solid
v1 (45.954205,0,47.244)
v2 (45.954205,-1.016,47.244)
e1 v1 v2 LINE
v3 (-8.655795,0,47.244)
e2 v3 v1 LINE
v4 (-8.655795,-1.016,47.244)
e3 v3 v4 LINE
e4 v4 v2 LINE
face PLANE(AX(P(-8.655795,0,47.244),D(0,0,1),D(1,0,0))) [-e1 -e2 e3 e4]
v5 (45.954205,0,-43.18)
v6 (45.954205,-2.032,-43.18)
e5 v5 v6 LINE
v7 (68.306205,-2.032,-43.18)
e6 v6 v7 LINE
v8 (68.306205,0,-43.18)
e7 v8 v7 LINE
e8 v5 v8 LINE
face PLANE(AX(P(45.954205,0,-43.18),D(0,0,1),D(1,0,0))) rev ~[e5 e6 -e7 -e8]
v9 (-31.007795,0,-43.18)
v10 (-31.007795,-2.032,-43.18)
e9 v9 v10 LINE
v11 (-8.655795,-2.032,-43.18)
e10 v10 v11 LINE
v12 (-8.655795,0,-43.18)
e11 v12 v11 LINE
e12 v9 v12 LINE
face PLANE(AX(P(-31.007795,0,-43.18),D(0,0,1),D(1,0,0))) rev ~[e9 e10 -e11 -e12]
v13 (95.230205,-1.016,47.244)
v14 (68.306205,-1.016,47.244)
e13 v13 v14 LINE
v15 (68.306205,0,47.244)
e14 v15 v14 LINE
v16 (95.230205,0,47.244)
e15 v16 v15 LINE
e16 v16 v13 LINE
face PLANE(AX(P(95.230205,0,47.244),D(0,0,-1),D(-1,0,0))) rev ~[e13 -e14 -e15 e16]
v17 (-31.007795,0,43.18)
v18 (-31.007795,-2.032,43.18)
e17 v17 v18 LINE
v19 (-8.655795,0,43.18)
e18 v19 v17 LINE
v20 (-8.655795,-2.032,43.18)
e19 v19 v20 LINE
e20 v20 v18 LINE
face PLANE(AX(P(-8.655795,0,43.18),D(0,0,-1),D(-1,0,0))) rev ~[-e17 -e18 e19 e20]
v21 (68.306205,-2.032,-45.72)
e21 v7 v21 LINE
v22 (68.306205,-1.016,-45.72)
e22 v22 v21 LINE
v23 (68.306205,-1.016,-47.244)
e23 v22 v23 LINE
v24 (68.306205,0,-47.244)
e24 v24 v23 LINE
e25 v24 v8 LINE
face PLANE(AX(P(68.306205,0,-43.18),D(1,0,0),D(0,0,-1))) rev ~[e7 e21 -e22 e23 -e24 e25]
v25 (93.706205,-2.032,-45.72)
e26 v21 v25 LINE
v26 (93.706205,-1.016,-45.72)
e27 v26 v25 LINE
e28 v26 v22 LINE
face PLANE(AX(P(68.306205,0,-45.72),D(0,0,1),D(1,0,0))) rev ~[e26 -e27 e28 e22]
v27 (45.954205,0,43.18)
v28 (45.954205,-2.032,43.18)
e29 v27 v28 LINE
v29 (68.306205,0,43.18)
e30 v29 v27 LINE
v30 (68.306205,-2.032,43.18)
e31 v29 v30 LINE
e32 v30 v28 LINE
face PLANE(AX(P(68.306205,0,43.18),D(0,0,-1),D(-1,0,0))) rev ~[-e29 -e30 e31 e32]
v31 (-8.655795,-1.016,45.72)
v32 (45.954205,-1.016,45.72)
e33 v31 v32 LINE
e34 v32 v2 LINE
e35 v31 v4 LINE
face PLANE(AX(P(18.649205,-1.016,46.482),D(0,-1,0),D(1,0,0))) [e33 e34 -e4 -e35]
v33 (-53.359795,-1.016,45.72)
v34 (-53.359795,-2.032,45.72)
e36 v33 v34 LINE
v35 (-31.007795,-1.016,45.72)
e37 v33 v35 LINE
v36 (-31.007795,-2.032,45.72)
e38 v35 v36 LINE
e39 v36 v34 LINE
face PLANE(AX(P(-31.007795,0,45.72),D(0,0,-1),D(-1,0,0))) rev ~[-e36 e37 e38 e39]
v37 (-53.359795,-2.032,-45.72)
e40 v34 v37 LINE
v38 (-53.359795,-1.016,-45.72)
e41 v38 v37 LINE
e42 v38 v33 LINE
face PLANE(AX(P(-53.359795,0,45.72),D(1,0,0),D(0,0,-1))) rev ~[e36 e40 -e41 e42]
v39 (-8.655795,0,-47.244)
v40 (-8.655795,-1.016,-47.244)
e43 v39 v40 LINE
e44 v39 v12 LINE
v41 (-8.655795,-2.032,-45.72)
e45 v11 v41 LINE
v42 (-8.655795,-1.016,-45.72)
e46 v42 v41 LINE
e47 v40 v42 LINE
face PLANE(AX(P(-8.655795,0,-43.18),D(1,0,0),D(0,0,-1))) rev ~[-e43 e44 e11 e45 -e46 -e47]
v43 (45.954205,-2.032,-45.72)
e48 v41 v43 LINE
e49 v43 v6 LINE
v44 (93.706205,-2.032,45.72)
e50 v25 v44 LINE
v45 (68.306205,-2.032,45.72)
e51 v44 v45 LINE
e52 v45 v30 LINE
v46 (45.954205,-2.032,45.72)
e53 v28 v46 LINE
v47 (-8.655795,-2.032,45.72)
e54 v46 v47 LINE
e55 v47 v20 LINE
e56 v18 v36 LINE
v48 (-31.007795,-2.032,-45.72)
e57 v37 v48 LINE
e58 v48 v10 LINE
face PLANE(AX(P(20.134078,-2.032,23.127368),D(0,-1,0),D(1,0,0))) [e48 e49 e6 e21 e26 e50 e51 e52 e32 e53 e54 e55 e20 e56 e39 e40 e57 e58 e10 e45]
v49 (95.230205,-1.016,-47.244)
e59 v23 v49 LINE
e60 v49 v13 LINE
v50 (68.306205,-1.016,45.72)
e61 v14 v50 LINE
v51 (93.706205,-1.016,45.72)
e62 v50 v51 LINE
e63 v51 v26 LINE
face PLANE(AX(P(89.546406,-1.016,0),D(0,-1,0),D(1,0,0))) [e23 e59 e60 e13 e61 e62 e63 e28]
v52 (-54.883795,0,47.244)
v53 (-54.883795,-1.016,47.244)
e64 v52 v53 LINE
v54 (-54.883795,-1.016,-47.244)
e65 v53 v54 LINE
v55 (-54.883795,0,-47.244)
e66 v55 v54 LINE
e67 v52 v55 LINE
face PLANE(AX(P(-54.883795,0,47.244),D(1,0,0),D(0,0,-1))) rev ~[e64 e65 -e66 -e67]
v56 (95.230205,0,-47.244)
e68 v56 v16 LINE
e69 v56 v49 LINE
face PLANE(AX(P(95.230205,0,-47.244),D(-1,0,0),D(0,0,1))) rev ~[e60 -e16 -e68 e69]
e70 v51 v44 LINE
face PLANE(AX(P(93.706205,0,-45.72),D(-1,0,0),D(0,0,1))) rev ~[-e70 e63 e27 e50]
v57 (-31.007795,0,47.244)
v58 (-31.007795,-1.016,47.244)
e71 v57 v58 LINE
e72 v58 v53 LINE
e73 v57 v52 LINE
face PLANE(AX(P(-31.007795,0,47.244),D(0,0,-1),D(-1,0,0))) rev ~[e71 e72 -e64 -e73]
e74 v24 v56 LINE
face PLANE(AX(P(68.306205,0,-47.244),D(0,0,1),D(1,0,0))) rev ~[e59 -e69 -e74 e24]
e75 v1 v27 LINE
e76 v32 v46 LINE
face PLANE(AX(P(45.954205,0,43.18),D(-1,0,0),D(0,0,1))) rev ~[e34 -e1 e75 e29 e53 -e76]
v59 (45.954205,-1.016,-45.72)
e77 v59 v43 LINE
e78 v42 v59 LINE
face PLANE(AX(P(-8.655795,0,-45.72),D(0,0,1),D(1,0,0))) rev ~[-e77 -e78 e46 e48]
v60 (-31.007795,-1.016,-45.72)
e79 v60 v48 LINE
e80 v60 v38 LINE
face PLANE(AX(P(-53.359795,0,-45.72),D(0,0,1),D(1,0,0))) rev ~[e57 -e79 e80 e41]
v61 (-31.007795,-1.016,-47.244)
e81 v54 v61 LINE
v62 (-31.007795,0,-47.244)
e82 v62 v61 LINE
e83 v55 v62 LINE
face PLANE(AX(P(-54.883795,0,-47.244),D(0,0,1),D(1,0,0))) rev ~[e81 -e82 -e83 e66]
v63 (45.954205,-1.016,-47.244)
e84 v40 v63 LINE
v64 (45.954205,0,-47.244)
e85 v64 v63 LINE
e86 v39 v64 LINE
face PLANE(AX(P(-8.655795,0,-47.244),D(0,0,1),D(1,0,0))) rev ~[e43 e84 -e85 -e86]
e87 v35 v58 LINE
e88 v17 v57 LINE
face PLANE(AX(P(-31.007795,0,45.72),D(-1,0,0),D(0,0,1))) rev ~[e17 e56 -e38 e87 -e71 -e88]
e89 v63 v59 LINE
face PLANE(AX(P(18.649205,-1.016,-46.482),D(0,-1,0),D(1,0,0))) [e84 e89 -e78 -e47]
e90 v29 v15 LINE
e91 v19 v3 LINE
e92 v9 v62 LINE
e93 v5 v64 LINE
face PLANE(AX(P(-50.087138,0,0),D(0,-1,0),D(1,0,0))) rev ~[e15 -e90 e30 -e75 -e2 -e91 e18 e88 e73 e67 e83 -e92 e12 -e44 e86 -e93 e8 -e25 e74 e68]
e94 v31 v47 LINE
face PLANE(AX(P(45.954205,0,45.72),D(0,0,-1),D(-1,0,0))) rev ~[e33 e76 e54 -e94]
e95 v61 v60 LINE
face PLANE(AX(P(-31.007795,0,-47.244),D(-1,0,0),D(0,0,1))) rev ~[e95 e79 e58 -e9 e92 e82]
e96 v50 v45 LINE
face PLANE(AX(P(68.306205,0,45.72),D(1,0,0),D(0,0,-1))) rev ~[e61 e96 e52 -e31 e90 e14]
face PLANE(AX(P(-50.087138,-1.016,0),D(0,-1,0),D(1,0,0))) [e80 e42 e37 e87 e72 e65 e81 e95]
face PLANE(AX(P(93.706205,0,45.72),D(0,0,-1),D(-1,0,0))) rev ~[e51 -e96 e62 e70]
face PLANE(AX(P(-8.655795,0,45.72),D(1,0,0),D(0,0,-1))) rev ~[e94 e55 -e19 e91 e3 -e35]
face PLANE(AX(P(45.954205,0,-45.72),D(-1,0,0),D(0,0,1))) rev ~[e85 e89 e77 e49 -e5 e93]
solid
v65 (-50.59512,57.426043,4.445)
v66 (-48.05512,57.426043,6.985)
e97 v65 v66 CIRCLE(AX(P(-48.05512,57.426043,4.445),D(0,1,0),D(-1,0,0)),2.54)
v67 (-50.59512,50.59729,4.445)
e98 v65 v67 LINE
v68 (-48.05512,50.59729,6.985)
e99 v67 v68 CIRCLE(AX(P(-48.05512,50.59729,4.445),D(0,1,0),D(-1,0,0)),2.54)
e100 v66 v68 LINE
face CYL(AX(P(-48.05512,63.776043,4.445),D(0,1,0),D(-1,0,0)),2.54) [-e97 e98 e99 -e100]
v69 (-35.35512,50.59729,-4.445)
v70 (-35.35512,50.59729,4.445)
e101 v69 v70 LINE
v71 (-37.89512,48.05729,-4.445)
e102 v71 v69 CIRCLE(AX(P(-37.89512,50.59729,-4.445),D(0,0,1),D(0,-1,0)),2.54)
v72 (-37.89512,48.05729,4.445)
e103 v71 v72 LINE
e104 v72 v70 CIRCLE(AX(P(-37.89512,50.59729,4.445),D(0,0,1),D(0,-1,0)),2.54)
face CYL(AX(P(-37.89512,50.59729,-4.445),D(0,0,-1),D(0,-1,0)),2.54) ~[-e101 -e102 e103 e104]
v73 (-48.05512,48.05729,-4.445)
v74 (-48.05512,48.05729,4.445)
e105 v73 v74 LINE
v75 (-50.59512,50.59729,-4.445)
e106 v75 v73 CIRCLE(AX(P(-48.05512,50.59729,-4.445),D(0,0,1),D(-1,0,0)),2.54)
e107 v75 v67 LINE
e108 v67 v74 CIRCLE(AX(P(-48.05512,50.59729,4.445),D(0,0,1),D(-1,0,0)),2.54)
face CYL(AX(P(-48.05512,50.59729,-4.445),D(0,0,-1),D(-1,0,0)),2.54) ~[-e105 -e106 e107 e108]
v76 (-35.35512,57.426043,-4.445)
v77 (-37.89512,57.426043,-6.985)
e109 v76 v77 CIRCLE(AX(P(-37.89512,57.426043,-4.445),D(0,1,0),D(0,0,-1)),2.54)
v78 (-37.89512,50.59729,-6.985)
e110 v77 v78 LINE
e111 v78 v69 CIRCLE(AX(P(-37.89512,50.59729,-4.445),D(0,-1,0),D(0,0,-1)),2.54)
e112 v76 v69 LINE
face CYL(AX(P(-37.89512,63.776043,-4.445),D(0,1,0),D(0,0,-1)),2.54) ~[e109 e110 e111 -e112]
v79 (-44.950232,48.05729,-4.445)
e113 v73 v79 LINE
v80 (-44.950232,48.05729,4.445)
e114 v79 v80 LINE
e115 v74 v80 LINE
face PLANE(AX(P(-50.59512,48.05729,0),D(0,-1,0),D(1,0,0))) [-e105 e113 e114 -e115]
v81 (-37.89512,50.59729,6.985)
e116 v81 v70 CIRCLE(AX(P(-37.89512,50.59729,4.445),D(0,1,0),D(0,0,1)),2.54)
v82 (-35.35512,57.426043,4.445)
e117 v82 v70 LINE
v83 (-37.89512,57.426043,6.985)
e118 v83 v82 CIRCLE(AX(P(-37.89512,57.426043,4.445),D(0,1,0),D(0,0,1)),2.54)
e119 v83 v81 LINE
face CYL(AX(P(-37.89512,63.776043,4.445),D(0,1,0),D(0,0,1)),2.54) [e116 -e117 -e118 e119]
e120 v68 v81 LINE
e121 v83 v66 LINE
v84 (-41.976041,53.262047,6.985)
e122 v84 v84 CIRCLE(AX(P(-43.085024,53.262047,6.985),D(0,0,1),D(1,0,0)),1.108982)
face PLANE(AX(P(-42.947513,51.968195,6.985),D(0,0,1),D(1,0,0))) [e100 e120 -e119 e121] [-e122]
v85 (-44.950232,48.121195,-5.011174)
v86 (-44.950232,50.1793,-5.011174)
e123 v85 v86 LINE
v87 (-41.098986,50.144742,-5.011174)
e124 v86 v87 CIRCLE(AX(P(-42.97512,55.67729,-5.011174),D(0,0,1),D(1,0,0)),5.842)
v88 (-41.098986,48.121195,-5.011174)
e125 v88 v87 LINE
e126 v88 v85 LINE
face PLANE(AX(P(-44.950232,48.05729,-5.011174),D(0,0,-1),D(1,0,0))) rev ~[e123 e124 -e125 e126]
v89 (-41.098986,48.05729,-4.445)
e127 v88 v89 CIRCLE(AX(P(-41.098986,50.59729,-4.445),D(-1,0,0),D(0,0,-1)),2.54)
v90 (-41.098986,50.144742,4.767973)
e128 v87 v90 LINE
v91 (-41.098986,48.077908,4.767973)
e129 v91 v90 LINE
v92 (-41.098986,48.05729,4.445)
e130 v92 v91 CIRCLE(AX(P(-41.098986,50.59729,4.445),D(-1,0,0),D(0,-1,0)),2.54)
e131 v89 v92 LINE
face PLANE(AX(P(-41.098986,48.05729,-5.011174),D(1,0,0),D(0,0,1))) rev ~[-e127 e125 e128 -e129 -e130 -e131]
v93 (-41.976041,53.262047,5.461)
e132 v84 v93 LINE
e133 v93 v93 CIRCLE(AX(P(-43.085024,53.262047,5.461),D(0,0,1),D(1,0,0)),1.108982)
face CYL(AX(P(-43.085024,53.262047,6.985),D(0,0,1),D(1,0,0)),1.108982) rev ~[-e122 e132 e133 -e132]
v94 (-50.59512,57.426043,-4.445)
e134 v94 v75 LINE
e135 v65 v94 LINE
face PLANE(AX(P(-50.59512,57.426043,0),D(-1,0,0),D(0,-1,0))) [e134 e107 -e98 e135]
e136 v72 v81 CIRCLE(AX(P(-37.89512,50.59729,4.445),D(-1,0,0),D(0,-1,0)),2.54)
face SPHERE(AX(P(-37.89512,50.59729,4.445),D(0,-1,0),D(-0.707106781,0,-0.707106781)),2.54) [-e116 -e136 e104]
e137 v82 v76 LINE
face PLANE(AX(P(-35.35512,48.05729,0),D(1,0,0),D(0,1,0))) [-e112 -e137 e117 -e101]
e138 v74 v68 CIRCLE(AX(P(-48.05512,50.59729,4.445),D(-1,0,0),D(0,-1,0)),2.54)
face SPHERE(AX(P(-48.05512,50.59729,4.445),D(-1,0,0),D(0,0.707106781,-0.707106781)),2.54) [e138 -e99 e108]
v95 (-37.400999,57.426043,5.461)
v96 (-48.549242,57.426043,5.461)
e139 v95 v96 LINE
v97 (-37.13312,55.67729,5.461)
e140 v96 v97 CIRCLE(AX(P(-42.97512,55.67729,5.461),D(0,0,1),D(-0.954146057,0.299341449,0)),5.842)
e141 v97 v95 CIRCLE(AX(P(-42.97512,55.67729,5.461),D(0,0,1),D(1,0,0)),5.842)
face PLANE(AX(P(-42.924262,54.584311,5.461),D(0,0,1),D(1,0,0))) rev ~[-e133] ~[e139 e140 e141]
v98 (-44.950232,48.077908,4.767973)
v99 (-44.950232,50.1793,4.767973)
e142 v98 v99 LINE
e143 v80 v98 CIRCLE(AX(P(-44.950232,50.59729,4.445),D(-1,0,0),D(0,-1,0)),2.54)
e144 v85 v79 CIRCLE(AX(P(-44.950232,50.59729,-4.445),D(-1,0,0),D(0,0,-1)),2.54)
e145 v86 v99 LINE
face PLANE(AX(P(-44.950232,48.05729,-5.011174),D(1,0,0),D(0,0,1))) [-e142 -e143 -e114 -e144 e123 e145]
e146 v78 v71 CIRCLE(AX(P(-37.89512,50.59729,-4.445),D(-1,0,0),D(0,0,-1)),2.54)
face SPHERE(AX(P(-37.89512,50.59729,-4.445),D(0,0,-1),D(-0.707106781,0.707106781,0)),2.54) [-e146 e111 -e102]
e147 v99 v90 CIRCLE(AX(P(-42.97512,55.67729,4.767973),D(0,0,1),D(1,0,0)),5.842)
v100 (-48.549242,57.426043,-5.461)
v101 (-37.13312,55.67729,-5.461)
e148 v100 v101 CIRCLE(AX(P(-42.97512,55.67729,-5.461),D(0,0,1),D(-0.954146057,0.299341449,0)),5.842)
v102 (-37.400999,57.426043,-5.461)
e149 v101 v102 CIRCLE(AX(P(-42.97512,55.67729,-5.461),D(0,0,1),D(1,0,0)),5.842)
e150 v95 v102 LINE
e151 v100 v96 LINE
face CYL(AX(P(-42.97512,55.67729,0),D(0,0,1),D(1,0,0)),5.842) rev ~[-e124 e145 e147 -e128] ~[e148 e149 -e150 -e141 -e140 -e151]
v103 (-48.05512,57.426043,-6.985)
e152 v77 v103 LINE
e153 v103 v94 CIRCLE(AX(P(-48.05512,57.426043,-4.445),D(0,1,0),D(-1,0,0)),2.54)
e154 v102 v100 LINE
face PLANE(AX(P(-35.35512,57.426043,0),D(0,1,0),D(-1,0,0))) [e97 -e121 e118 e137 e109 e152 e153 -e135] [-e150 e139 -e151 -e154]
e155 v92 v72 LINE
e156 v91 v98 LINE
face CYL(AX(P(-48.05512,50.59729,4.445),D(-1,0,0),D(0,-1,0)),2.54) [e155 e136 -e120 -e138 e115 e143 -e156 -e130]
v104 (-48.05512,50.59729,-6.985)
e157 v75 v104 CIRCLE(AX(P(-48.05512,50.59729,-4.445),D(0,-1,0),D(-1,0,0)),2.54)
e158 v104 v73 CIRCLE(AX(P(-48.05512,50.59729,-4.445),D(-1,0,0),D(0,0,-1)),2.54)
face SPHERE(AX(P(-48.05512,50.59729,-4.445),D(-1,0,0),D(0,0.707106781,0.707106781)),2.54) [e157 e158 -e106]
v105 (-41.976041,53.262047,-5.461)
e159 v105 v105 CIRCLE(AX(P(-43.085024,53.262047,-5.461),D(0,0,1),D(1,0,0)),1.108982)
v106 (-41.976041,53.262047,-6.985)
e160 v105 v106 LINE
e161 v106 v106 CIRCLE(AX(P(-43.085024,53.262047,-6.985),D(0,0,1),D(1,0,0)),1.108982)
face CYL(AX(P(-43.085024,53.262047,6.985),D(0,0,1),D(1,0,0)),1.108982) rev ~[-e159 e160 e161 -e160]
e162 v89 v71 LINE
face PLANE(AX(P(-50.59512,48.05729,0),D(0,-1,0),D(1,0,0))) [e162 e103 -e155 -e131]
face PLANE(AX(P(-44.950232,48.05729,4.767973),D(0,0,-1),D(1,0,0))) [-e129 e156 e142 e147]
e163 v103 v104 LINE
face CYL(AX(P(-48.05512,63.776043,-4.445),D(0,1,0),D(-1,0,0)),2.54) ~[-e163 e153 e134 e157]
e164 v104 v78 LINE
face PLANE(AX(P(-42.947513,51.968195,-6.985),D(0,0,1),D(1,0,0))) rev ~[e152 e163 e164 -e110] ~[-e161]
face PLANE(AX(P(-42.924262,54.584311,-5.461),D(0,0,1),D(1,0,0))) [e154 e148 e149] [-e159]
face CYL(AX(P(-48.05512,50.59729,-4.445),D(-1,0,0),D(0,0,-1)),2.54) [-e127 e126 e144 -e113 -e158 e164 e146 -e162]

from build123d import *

# Parameters (mm, degrees)
F1_DEPTH      = 2.032
F0_W          = 54.61
F0_H          = 1.524
F2_DEPTH      = 1.016
F4_DEPTH      = 6.985
F5_DEPTH      = 5.461
F6_R          = 1.108982449
F7_DEPTH      = 25.4
F8_W          = 3.8512460887
F8_H          = 9.7791478038
F9_DEPTH      = 25.4
F10_T1_DEPTH  = 13.1787527424
F10_T3_DEPTH  = 8.89
F10_T5_DEPTH  = 10.16
F10_S9_W      = 2.54
F10_S9_H      = 2.54
F10_T10_DEPTH = 2.54
F10_S15_W     = 2.54
F10_S15_H     = 2.54
F10_T16_DEPTH = 2.54
F10_S21_W     = 2.54
F10_S21_H     = 2.54
F10_T22_DEPTH = 2.54
F10_S27_W     = 2.54
F10_S27_H     = 2.54
F10_T28_DEPTH = 2.54


# Not quite as in the source:
# - a fillet or chamfer that OpenCascade refuses, or shapes differently, is made with other operations: its cross-section is extruded or revolved along the edge and cut away or added


with BuildPart() as f1:
    # F0 (on Front) → F1 (new body)
    with BuildSketch(Plane.XZ):
        Polygon((-53.3597948303, 45.72), (-53.3597948303, 0), (93.7062051697, 0), (93.7062051697, 45.72), (68.3062051697, 45.72), (68.3062051697, 43.18), (45.9542051697, 43.18), (45.9542051697, 45.72), (-8.6557948303, 45.72), (-8.6557948303, 43.18), (-31.0077948303, 43.18), (-31.0077948303, 45.72), align=None)
        Polygon((93.7062051697, 0), (-53.3597948303, 0), (-53.3597948303, -45.72), (-31.0077948303, -45.72), (-31.0077948303, -43.18), (-8.6557948303, -43.18), (-8.6557948303, -45.72), (45.9542051697, -45.72), (45.9542051697, -43.18), (68.3062051697, -43.18), (68.3062051697, -45.72), (93.7062051697, -45.72), align=None)
    extrude(amount=F1_DEPTH)

    # F0 (on Front) → F2 (join)
    with BuildSketch(Plane.XZ):
        Polygon((-53.3597948303, -45.72), (-53.3597948303, 0), (-53.3597948303, 45.72), (-31.0077948303, 45.72), (-31.0077948303, 47.244), (-54.8837948303, 47.244), (-54.8837948303, 0), (-54.8837948303, -47.244), (-31.0077948303, -47.244), (-31.0077948303, -45.72), align=None)
        with Locations((18.6492051697, 46.482)):
            Rectangle(F0_W, F0_H)
        Polygon((93.7062051697, 45.72), (93.7062051697, 0), (93.7062051697, -45.72), (68.3062051697, -45.72), (68.3062051697, -47.244), (95.2302051697, -47.244), (95.2302051697, 12.7), (95.2302051697, 47.244), (68.3062051697, 47.244), (68.3062051697, 45.72), align=None)
        with Locations((18.6492051697, -46.482)):
            Rectangle(F0_W, F0_H)
    extrude(amount=F2_DEPTH)


with BuildPart() as f4:
    # F3 (on Top) → F4 (new body, symmetric)
    with BuildSketch(Plane.XY):
        with BuildLine():
            Line((-48.5492415086, 57.4260428548), (-50.5951202464, 57.4260428548))
            Line((-50.5951202464, 57.4260428548), (-50.5951202464, 48.0572901124))
            Line((-50.5951202464, 48.0572901124), (-35.3551202464, 48.0572901124))
            Line((-35.3551202464, 48.0572901124), (-35.3551202464, 57.4260428548))
            Line((-35.3551202464, 57.4260428548), (-37.4009989842, 57.4260428548))
            ThreePointArc((-37.4009989842, 57.4260428548), (-37.2004782482, 56.5618655999), (-37.1331202464, 55.6772901124))
            ThreePointArc((-37.1331202464, 55.6772901124), (-43.8596957339, 49.9026481143), (-48.5492415086, 57.4260428548))
        make_face()
        with BuildLine():
            Line((-37.4009989842, 57.4260428548), (-48.5492415086, 57.4260428548))
            ThreePointArc((-48.5492415086, 57.4260428548), (-43.8596957339, 49.9026481143), (-37.1331202464, 55.6772901124))
            ThreePointArc((-37.1331202464, 55.6772901124), (-37.2004782482, 56.5618655999), (-37.4009989842, 57.4260428548))
        make_face()
    extrude(amount=F4_DEPTH, both=True)

    # F3 (on Top) → F5 (cut, symmetric)
    with BuildSketch(Plane.XY):
        with BuildLine():
            Line((-37.4009989842, 57.4260428548), (-48.5492415086, 57.4260428548))
            ThreePointArc((-48.5492415086, 57.4260428548), (-43.8596957339, 49.9026481143), (-37.1331202464, 55.6772901124))
            ThreePointArc((-37.1331202464, 55.6772901124), (-37.2004782482, 56.5618655999), (-37.4009989842, 57.4260428548))
        make_face()
    extrude(amount=F5_DEPTH, both=True, mode=Mode.SUBTRACT)

    # F6 (on face) → F7 (cut)
    with BuildSketch(Plane.XY.offset(6.985)):
        with Locations((-43.0850237608, 53.2620474696)):
            Circle(F6_R)
    extrude(amount=-F7_DEPTH, mode=Mode.SUBTRACT)

    # F8 (on face) → F9 (cut)
    with BuildSketch(Plane.XZ.offset(-48.0572901124)):
        with Locations((-43.0246088654, -0.1216004603)):
            Rectangle(F8_W, F8_H)
    extrude(amount=-F9_DEPTH, mode=Mode.SUBTRACT)

    # F10: fillet of radius 2.54 on 8 edges, made by hand

    # F10_s2 → F10_t1 (cut)
    with BuildSketch(Plane.XZ.offset(-63.7760428548)):
        with BuildLine():
            ThreePointArc((-50.5951202464, 4.445), (-49.8511714706, 6.2410512242), (-48.0551202464, 6.985))
            Line((-48.0551202464, 6.985), (-50.5951202464, 6.985))
            Line((-50.5951202464, 6.985), (-50.5951202464, 4.445))
        make_face()
        with BuildLine():
            ThreePointArc((-50.5951202464, -4.445), (-49.8511714706, -6.2410512242), (-48.0551202464, -6.985))
            Line((-48.0551202464, -6.985), (-50.5951202464, -6.985))
            Line((-50.5951202464, -6.985), (-50.5951202464, -4.445))
        make_face()
        with BuildLine():
            ThreePointArc((-37.8951202464, 6.985), (-36.0990690222, 6.2410512242), (-35.3551202464, 4.445))
            Line((-35.3551202464, 4.445), (-35.3551202464, 6.985))
            Line((-35.3551202464, 6.985), (-37.8951202464, 6.985))
        make_face()
        with BuildLine():
            ThreePointArc((-37.8951202464, -6.985), (-36.0990690222, -6.2410512242), (-35.3551202464, -4.445))
            Line((-35.3551202464, -4.445), (-35.3551202464, -6.985))
            Line((-35.3551202464, -6.985), (-37.8951202464, -6.985))
        make_face()
    extrude(amount=F10_T1_DEPTH, mode=Mode.SUBTRACT)

    # F10_s4 → F10_t3 (cut)
    with BuildSketch(Plane.XY.offset(-4.445)):
        with BuildLine():
            ThreePointArc((-50.5951202464, 50.5972901124), (-49.8511714706, 48.8012388882), (-48.0551202464, 48.0572901124))
            Line((-48.0551202464, 48.0572901124), (-50.5951202464, 48.0572901124))
            Line((-50.5951202464, 48.0572901124), (-50.5951202464, 50.5972901124))
        make_face()
        with BuildLine():
            ThreePointArc((-37.8951202464, 48.0572901124), (-36.0990690222, 48.8012388882), (-35.3551202464, 50.5972901124))
            Line((-35.3551202464, 50.5972901124), (-35.3551202464, 48.0572901124))
            Line((-35.3551202464, 48.0572901124), (-37.8951202464, 48.0572901124))
        make_face()
    extrude(amount=F10_T3_DEPTH, mode=Mode.SUBTRACT)

    # F10_s6 → F10_t5 (cut)
    with BuildSketch(Plane.YZ.offset(-48.0551202464)):
        with BuildLine():
            ThreePointArc((50.5972901124, -6.985), (48.8012388882, -6.2410512242), (48.0572901124, -4.445))
            Line((48.0572901124, -4.445), (48.0572901124, -6.985))
            Line((48.0572901124, -6.985), (50.5972901124, -6.985))
        make_face()
        with BuildLine():
            ThreePointArc((48.0572901124, 4.445), (48.8012388882, 6.2410512242), (50.5972901124, 6.985))
            Line((50.5972901124, 6.985), (48.0572901124, 6.985))
            Line((48.0572901124, 6.985), (48.0572901124, 4.445))
        make_face()
    extrude(amount=F10_T5_DEPTH, mode=Mode.SUBTRACT)


with BuildPart() as f10_tool8:
    # F10_s9 → F10_t10 (new body)
    with BuildSketch(Plane.YZ.offset(-48.0551202464)):
        with Locations((49.3272901124, 5.715)):
            Rectangle(F10_S9_W, F10_S9_H)
    extrude(amount=-F10_T10_DEPTH)

    # F10_s11 → F10_t12 (revolve, cut)
    with BuildSketch(Plane(origin=(-48.0551202464, 50.5972901124, 4.445), x_dir=(0, 0.7071067812, -0.7071067812), z_dir=(0, 0.7071067812, 0.7071067812))):
        with BuildLine():
            ThreePointArc((0, -2.54), (2.54, 0), (0, 2.54))
            Line((0, 2.54), (0, -2.54))
        make_face()
    revolve(axis=Axis((-48.0551202464, 50.5972901124, 4.445), (-1, 0, 0)), mode=Mode.SUBTRACT)


with BuildPart() as f4_1:
    add(f4.part)

    # F10_t7: cut F10_tool8
    add(f10_tool8.part, mode=Mode.SUBTRACT)


with BuildPart() as f10_tool14:
    # F10_s15 → F10_t16 (new body)
    with BuildSketch(Plane.YZ.offset(-48.0551202464)):
        with Locations((49.3272901124, -5.715)):
            Rectangle(F10_S15_W, F10_S15_H)
    extrude(amount=-F10_T16_DEPTH)

    # F10_s17 → F10_t18 (revolve, cut)
    with BuildSketch(Plane(origin=(-48.0551202464, 50.5972901124, -4.445), x_dir=(0, 0.7071067812, 0.7071067812), z_dir=(0, -0.7071067812, 0.7071067812))):
        with BuildLine():
            ThreePointArc((0, -2.54), (2.54, 0), (0, 2.54))
            Line((0, 2.54), (0, -2.54))
        make_face()
    revolve(axis=Axis((-48.0551202464, 50.5972901124, -4.445), (-1, 0, 0)), mode=Mode.SUBTRACT)


with BuildPart() as f4_2:
    add(f4_1.part)

    # F10_t13: cut F10_tool14
    add(f10_tool14.part, mode=Mode.SUBTRACT)


with BuildPart() as f10_tool20:
    # F10_s21 → F10_t22 (new body)
    with BuildSketch(Plane.XZ.offset(-50.5972901124)):
        with Locations((-36.6251202464, 5.715)):
            Rectangle(F10_S21_W, F10_S21_H)
    extrude(amount=F10_T22_DEPTH)

    # F10_s23 → F10_t24 (revolve, cut)
    with BuildSketch(Plane(origin=(-37.8951202464, 50.5972901124, 4.445), x_dir=(-0.7071067812, 0, -0.7071067812), z_dir=(-0.7071067812, 0, 0.7071067812))):
        with BuildLine():
            ThreePointArc((0, -2.54), (2.54, 0), (0, 2.54))
            Line((0, 2.54), (0, -2.54))
        make_face()
    revolve(axis=Axis((-37.8951202464, 50.5972901124, 4.445), (0, -1, 0)), mode=Mode.SUBTRACT)


with BuildPart() as f4_3:
    add(f4_2.part)

    # F10_t19: cut F10_tool20
    add(f10_tool20.part, mode=Mode.SUBTRACT)


with BuildPart() as f10_tool26:
    # F10_s27 → F10_t28 (new body)
    with BuildSketch(Plane.XY.offset(-4.445)):
        with Locations((-36.6251202464, 49.3272901124)):
            Rectangle(F10_S27_W, F10_S27_H)
    extrude(amount=-F10_T28_DEPTH)

    # F10_s29 → F10_t30 (revolve, cut)
    with BuildSketch(Plane(origin=(-37.8951202464, 50.5972901124, -4.445), x_dir=(-0.7071067812, 0.7071067812, 0), z_dir=(-0.7071067812, -0.7071067812, 0))):
        with BuildLine():
            ThreePointArc((0, -2.54), (2.54, 0), (0, 2.54))
            Line((0, 2.54), (0, -2.54))
        make_face()
    revolve(axis=Axis((-37.8951202464, 50.5972901124, -4.445), (0, 0, -1)), mode=Mode.SUBTRACT)


with BuildPart() as f4_4:
    add(f4_3.part)

    # F10_t25: cut F10_tool26
    add(f10_tool26.part, mode=Mode.SUBTRACT)


solid = Compound([f1.part, f4_4.part])
